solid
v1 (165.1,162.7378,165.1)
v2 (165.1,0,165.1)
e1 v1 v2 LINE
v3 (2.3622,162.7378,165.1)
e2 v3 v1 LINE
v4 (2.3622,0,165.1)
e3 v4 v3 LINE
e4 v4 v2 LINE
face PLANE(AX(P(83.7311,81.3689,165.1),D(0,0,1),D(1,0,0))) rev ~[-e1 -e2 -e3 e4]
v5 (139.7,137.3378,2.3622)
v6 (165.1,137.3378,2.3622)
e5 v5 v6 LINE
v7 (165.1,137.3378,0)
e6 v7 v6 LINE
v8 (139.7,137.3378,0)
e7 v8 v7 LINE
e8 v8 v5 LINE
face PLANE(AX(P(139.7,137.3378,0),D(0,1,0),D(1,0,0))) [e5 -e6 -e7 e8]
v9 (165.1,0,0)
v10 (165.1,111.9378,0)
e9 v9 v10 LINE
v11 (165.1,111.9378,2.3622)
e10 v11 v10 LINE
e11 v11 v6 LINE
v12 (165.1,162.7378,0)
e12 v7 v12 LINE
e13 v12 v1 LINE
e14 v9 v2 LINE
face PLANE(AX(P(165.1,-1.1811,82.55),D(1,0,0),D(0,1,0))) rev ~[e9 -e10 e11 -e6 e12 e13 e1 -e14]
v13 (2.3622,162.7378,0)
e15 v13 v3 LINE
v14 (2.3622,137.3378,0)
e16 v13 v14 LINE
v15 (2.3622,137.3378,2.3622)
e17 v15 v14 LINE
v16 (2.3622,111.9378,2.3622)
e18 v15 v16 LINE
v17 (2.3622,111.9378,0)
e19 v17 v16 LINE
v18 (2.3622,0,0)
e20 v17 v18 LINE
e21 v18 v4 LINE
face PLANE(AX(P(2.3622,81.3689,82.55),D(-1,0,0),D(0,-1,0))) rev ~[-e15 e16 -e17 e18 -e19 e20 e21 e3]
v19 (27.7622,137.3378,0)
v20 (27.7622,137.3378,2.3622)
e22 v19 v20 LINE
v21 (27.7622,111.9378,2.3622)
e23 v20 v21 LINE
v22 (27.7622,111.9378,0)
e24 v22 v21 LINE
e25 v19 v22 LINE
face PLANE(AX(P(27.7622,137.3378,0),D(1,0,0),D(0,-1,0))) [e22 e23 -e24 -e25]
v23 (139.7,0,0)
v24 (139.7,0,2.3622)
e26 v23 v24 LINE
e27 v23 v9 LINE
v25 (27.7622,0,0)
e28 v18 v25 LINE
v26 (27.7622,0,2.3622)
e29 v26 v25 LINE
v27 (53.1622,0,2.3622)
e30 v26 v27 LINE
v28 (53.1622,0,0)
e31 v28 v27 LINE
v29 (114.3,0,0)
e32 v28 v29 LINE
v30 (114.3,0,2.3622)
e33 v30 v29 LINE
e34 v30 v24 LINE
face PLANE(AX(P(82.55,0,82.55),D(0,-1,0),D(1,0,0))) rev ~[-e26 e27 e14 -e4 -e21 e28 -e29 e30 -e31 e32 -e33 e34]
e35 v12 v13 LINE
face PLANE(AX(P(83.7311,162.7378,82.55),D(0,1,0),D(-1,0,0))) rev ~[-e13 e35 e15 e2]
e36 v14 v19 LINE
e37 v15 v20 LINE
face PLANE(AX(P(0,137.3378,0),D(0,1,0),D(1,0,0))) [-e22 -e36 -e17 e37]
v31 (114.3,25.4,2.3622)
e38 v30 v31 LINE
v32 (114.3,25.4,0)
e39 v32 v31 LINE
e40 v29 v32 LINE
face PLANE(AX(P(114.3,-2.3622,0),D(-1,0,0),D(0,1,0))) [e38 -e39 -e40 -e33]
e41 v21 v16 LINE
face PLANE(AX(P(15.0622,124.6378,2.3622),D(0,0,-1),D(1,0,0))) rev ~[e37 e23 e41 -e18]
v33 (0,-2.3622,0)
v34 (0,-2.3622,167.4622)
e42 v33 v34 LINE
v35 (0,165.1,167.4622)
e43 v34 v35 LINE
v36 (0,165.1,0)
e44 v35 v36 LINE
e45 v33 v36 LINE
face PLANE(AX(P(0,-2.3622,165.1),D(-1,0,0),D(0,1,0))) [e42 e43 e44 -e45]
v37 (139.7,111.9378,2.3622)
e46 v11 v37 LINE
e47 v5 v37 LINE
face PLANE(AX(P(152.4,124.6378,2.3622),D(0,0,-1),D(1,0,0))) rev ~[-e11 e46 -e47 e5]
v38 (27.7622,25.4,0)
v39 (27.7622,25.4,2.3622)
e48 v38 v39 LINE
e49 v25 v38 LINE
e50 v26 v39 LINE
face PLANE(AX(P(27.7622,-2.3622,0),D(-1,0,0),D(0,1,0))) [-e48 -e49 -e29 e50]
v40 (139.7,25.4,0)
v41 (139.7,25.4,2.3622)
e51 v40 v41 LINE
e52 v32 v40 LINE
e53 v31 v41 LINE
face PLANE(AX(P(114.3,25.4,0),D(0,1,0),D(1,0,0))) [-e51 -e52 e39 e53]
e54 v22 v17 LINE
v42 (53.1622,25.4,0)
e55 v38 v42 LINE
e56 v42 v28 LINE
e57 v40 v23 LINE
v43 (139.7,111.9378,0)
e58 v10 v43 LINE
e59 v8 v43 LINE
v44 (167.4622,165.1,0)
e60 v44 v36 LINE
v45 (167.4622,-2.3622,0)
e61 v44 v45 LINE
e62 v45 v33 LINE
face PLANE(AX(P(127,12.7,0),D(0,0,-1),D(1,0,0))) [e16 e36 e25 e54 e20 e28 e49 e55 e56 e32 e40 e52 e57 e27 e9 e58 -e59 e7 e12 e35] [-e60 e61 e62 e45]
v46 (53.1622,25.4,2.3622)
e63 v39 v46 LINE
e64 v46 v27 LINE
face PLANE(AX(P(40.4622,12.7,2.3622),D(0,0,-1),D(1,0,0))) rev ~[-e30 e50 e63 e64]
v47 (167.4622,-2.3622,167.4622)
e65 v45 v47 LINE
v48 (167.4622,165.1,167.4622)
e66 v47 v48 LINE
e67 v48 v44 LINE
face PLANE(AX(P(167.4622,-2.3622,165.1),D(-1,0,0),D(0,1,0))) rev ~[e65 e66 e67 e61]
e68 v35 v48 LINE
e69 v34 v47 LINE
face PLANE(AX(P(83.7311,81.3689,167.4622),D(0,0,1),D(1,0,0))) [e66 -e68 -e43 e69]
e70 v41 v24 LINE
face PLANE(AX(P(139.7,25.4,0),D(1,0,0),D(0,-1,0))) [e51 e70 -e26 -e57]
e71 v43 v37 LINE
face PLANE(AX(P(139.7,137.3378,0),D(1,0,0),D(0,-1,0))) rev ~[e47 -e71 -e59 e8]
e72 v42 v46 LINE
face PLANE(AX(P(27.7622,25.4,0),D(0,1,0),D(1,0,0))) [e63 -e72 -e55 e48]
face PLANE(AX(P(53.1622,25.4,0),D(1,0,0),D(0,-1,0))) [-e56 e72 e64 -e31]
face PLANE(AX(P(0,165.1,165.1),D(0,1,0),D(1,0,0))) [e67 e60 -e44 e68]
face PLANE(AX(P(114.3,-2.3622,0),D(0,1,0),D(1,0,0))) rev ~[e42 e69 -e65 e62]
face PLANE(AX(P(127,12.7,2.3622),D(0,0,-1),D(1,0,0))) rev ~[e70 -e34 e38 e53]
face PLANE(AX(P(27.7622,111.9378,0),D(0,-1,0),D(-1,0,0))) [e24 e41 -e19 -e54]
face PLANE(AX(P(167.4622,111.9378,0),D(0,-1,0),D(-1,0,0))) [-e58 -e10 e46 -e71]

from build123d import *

# Parameters (mm, degrees)
F0_W      = 165.1
F0_H      = 165.1
F1_DEPTH  = 2.3622
F2_W      = 2.3622
F2_H      = 165.1
F2_W_2    = 162.7378
F3_DEPTH  = 2.3622
F4_W      = 162.7378
F4_H      = 165.1
F4_W_2    = 2.3622
F5_DEPTH  = 2.3622
F6_W      = 162.7378
F6_H      = 165.1
F6_W_2    = 2.3622
F7_DEPTH  = 2.3622
F8_W      = 167.4622
F8_H      = 167.4622
F8_W_2    = 162.7378
F8_H_2    = 162.7378
F9_DEPTH  = 2.3622
F10_W     = 25.4
F10_H     = 25.4
F10_H_2   = 2.3622
F10_W_2   = 2.3622
F11_DEPTH = 2.3622


with BuildPart() as f1:
    # F0 (on Front) → F1 (new body)
    with BuildSketch(Plane.XZ):
        with Locations((82.55, 82.55)):
            Rectangle(F0_W, F0_H)
    extrude(amount=F1_DEPTH)

    # F2 (on face) → F3 (join)
    with BuildSketch(Plane.YZ.offset(165.1)):
        with Locations((-1.1811, 82.55)):
            Rectangle(F2_W, F2_H)
        with Locations((81.3689, 82.55)):
            Rectangle(F2_W_2, F2_H)
    extrude(amount=F3_DEPTH)

    # F4 (on face) → F5 (join)
    with BuildSketch(Plane(origin=(0, 162.7378, 0), x_dir=(-1, 0, 0), z_dir=(0, 1, 0))):
        with Locations((-83.7311, 82.55)):
            Rectangle(F4_W, F4_H)
        with Locations((-166.2811, 82.55)):
            Rectangle(F4_W_2, F4_H)
    extrude(amount=F5_DEPTH)

    # F6 (on face) → F7 (join)
    with BuildSketch(Plane(origin=(2.3622, 0, 0), x_dir=(0, -1, 0), z_dir=(-1, 0, 0))):
        with Locations((-81.3689, 82.55)):
            Rectangle(F6_W, F6_H)
        with Locations((-163.9189, 82.55)):
            Rectangle(F6_W_2, F6_H)
    extrude(amount=F7_DEPTH)

    # F8 (on face) → F9 (join)
    with BuildSketch(Plane.XY.offset(165.1)):
        with Locations((83.7311, 81.3689)):
            Rectangle(F8_W, F8_H)
        with Locations((83.7311, 81.3689)):
            Rectangle(F8_W_2, F8_H_2, mode=Mode.SUBTRACT)
        with Locations((83.7311, 81.3689)):
            Rectangle(F8_W_2, F8_H_2)
    extrude(amount=F9_DEPTH)

    # F10 (on face) → F11 (join)
    with BuildSketch(Plane(origin=(0, 0, 0), x_dir=(1, 0, 0), z_dir=(0, 0, -1))):
        with Locations((127, -12.7)):
            Rectangle(F10_W, F10_H)
        with Locations((152.4, -124.6378)):
            Rectangle(F10_W, F10_H)
        with Locations((40.4622, -12.7)):
            Rectangle(F10_W, F10_H)
        with Locations((15.0622, -124.6378)):
            Rectangle(F10_W, F10_H)
        with Locations((40.4622, 1.1811)):
            Rectangle(F10_W, F10_H_2)
        with Locations((127, 1.1811)):
            Rectangle(F10_W, F10_H_2)
        with Locations((1.1811, -124.6378)):
            Rectangle(F10_W_2, F10_H)
        with Locations((166.2811, -124.6378)):
            Rectangle(F10_W_2, F10_H)
    extrude(amount=-F11_DEPTH)


solid = f1.part
